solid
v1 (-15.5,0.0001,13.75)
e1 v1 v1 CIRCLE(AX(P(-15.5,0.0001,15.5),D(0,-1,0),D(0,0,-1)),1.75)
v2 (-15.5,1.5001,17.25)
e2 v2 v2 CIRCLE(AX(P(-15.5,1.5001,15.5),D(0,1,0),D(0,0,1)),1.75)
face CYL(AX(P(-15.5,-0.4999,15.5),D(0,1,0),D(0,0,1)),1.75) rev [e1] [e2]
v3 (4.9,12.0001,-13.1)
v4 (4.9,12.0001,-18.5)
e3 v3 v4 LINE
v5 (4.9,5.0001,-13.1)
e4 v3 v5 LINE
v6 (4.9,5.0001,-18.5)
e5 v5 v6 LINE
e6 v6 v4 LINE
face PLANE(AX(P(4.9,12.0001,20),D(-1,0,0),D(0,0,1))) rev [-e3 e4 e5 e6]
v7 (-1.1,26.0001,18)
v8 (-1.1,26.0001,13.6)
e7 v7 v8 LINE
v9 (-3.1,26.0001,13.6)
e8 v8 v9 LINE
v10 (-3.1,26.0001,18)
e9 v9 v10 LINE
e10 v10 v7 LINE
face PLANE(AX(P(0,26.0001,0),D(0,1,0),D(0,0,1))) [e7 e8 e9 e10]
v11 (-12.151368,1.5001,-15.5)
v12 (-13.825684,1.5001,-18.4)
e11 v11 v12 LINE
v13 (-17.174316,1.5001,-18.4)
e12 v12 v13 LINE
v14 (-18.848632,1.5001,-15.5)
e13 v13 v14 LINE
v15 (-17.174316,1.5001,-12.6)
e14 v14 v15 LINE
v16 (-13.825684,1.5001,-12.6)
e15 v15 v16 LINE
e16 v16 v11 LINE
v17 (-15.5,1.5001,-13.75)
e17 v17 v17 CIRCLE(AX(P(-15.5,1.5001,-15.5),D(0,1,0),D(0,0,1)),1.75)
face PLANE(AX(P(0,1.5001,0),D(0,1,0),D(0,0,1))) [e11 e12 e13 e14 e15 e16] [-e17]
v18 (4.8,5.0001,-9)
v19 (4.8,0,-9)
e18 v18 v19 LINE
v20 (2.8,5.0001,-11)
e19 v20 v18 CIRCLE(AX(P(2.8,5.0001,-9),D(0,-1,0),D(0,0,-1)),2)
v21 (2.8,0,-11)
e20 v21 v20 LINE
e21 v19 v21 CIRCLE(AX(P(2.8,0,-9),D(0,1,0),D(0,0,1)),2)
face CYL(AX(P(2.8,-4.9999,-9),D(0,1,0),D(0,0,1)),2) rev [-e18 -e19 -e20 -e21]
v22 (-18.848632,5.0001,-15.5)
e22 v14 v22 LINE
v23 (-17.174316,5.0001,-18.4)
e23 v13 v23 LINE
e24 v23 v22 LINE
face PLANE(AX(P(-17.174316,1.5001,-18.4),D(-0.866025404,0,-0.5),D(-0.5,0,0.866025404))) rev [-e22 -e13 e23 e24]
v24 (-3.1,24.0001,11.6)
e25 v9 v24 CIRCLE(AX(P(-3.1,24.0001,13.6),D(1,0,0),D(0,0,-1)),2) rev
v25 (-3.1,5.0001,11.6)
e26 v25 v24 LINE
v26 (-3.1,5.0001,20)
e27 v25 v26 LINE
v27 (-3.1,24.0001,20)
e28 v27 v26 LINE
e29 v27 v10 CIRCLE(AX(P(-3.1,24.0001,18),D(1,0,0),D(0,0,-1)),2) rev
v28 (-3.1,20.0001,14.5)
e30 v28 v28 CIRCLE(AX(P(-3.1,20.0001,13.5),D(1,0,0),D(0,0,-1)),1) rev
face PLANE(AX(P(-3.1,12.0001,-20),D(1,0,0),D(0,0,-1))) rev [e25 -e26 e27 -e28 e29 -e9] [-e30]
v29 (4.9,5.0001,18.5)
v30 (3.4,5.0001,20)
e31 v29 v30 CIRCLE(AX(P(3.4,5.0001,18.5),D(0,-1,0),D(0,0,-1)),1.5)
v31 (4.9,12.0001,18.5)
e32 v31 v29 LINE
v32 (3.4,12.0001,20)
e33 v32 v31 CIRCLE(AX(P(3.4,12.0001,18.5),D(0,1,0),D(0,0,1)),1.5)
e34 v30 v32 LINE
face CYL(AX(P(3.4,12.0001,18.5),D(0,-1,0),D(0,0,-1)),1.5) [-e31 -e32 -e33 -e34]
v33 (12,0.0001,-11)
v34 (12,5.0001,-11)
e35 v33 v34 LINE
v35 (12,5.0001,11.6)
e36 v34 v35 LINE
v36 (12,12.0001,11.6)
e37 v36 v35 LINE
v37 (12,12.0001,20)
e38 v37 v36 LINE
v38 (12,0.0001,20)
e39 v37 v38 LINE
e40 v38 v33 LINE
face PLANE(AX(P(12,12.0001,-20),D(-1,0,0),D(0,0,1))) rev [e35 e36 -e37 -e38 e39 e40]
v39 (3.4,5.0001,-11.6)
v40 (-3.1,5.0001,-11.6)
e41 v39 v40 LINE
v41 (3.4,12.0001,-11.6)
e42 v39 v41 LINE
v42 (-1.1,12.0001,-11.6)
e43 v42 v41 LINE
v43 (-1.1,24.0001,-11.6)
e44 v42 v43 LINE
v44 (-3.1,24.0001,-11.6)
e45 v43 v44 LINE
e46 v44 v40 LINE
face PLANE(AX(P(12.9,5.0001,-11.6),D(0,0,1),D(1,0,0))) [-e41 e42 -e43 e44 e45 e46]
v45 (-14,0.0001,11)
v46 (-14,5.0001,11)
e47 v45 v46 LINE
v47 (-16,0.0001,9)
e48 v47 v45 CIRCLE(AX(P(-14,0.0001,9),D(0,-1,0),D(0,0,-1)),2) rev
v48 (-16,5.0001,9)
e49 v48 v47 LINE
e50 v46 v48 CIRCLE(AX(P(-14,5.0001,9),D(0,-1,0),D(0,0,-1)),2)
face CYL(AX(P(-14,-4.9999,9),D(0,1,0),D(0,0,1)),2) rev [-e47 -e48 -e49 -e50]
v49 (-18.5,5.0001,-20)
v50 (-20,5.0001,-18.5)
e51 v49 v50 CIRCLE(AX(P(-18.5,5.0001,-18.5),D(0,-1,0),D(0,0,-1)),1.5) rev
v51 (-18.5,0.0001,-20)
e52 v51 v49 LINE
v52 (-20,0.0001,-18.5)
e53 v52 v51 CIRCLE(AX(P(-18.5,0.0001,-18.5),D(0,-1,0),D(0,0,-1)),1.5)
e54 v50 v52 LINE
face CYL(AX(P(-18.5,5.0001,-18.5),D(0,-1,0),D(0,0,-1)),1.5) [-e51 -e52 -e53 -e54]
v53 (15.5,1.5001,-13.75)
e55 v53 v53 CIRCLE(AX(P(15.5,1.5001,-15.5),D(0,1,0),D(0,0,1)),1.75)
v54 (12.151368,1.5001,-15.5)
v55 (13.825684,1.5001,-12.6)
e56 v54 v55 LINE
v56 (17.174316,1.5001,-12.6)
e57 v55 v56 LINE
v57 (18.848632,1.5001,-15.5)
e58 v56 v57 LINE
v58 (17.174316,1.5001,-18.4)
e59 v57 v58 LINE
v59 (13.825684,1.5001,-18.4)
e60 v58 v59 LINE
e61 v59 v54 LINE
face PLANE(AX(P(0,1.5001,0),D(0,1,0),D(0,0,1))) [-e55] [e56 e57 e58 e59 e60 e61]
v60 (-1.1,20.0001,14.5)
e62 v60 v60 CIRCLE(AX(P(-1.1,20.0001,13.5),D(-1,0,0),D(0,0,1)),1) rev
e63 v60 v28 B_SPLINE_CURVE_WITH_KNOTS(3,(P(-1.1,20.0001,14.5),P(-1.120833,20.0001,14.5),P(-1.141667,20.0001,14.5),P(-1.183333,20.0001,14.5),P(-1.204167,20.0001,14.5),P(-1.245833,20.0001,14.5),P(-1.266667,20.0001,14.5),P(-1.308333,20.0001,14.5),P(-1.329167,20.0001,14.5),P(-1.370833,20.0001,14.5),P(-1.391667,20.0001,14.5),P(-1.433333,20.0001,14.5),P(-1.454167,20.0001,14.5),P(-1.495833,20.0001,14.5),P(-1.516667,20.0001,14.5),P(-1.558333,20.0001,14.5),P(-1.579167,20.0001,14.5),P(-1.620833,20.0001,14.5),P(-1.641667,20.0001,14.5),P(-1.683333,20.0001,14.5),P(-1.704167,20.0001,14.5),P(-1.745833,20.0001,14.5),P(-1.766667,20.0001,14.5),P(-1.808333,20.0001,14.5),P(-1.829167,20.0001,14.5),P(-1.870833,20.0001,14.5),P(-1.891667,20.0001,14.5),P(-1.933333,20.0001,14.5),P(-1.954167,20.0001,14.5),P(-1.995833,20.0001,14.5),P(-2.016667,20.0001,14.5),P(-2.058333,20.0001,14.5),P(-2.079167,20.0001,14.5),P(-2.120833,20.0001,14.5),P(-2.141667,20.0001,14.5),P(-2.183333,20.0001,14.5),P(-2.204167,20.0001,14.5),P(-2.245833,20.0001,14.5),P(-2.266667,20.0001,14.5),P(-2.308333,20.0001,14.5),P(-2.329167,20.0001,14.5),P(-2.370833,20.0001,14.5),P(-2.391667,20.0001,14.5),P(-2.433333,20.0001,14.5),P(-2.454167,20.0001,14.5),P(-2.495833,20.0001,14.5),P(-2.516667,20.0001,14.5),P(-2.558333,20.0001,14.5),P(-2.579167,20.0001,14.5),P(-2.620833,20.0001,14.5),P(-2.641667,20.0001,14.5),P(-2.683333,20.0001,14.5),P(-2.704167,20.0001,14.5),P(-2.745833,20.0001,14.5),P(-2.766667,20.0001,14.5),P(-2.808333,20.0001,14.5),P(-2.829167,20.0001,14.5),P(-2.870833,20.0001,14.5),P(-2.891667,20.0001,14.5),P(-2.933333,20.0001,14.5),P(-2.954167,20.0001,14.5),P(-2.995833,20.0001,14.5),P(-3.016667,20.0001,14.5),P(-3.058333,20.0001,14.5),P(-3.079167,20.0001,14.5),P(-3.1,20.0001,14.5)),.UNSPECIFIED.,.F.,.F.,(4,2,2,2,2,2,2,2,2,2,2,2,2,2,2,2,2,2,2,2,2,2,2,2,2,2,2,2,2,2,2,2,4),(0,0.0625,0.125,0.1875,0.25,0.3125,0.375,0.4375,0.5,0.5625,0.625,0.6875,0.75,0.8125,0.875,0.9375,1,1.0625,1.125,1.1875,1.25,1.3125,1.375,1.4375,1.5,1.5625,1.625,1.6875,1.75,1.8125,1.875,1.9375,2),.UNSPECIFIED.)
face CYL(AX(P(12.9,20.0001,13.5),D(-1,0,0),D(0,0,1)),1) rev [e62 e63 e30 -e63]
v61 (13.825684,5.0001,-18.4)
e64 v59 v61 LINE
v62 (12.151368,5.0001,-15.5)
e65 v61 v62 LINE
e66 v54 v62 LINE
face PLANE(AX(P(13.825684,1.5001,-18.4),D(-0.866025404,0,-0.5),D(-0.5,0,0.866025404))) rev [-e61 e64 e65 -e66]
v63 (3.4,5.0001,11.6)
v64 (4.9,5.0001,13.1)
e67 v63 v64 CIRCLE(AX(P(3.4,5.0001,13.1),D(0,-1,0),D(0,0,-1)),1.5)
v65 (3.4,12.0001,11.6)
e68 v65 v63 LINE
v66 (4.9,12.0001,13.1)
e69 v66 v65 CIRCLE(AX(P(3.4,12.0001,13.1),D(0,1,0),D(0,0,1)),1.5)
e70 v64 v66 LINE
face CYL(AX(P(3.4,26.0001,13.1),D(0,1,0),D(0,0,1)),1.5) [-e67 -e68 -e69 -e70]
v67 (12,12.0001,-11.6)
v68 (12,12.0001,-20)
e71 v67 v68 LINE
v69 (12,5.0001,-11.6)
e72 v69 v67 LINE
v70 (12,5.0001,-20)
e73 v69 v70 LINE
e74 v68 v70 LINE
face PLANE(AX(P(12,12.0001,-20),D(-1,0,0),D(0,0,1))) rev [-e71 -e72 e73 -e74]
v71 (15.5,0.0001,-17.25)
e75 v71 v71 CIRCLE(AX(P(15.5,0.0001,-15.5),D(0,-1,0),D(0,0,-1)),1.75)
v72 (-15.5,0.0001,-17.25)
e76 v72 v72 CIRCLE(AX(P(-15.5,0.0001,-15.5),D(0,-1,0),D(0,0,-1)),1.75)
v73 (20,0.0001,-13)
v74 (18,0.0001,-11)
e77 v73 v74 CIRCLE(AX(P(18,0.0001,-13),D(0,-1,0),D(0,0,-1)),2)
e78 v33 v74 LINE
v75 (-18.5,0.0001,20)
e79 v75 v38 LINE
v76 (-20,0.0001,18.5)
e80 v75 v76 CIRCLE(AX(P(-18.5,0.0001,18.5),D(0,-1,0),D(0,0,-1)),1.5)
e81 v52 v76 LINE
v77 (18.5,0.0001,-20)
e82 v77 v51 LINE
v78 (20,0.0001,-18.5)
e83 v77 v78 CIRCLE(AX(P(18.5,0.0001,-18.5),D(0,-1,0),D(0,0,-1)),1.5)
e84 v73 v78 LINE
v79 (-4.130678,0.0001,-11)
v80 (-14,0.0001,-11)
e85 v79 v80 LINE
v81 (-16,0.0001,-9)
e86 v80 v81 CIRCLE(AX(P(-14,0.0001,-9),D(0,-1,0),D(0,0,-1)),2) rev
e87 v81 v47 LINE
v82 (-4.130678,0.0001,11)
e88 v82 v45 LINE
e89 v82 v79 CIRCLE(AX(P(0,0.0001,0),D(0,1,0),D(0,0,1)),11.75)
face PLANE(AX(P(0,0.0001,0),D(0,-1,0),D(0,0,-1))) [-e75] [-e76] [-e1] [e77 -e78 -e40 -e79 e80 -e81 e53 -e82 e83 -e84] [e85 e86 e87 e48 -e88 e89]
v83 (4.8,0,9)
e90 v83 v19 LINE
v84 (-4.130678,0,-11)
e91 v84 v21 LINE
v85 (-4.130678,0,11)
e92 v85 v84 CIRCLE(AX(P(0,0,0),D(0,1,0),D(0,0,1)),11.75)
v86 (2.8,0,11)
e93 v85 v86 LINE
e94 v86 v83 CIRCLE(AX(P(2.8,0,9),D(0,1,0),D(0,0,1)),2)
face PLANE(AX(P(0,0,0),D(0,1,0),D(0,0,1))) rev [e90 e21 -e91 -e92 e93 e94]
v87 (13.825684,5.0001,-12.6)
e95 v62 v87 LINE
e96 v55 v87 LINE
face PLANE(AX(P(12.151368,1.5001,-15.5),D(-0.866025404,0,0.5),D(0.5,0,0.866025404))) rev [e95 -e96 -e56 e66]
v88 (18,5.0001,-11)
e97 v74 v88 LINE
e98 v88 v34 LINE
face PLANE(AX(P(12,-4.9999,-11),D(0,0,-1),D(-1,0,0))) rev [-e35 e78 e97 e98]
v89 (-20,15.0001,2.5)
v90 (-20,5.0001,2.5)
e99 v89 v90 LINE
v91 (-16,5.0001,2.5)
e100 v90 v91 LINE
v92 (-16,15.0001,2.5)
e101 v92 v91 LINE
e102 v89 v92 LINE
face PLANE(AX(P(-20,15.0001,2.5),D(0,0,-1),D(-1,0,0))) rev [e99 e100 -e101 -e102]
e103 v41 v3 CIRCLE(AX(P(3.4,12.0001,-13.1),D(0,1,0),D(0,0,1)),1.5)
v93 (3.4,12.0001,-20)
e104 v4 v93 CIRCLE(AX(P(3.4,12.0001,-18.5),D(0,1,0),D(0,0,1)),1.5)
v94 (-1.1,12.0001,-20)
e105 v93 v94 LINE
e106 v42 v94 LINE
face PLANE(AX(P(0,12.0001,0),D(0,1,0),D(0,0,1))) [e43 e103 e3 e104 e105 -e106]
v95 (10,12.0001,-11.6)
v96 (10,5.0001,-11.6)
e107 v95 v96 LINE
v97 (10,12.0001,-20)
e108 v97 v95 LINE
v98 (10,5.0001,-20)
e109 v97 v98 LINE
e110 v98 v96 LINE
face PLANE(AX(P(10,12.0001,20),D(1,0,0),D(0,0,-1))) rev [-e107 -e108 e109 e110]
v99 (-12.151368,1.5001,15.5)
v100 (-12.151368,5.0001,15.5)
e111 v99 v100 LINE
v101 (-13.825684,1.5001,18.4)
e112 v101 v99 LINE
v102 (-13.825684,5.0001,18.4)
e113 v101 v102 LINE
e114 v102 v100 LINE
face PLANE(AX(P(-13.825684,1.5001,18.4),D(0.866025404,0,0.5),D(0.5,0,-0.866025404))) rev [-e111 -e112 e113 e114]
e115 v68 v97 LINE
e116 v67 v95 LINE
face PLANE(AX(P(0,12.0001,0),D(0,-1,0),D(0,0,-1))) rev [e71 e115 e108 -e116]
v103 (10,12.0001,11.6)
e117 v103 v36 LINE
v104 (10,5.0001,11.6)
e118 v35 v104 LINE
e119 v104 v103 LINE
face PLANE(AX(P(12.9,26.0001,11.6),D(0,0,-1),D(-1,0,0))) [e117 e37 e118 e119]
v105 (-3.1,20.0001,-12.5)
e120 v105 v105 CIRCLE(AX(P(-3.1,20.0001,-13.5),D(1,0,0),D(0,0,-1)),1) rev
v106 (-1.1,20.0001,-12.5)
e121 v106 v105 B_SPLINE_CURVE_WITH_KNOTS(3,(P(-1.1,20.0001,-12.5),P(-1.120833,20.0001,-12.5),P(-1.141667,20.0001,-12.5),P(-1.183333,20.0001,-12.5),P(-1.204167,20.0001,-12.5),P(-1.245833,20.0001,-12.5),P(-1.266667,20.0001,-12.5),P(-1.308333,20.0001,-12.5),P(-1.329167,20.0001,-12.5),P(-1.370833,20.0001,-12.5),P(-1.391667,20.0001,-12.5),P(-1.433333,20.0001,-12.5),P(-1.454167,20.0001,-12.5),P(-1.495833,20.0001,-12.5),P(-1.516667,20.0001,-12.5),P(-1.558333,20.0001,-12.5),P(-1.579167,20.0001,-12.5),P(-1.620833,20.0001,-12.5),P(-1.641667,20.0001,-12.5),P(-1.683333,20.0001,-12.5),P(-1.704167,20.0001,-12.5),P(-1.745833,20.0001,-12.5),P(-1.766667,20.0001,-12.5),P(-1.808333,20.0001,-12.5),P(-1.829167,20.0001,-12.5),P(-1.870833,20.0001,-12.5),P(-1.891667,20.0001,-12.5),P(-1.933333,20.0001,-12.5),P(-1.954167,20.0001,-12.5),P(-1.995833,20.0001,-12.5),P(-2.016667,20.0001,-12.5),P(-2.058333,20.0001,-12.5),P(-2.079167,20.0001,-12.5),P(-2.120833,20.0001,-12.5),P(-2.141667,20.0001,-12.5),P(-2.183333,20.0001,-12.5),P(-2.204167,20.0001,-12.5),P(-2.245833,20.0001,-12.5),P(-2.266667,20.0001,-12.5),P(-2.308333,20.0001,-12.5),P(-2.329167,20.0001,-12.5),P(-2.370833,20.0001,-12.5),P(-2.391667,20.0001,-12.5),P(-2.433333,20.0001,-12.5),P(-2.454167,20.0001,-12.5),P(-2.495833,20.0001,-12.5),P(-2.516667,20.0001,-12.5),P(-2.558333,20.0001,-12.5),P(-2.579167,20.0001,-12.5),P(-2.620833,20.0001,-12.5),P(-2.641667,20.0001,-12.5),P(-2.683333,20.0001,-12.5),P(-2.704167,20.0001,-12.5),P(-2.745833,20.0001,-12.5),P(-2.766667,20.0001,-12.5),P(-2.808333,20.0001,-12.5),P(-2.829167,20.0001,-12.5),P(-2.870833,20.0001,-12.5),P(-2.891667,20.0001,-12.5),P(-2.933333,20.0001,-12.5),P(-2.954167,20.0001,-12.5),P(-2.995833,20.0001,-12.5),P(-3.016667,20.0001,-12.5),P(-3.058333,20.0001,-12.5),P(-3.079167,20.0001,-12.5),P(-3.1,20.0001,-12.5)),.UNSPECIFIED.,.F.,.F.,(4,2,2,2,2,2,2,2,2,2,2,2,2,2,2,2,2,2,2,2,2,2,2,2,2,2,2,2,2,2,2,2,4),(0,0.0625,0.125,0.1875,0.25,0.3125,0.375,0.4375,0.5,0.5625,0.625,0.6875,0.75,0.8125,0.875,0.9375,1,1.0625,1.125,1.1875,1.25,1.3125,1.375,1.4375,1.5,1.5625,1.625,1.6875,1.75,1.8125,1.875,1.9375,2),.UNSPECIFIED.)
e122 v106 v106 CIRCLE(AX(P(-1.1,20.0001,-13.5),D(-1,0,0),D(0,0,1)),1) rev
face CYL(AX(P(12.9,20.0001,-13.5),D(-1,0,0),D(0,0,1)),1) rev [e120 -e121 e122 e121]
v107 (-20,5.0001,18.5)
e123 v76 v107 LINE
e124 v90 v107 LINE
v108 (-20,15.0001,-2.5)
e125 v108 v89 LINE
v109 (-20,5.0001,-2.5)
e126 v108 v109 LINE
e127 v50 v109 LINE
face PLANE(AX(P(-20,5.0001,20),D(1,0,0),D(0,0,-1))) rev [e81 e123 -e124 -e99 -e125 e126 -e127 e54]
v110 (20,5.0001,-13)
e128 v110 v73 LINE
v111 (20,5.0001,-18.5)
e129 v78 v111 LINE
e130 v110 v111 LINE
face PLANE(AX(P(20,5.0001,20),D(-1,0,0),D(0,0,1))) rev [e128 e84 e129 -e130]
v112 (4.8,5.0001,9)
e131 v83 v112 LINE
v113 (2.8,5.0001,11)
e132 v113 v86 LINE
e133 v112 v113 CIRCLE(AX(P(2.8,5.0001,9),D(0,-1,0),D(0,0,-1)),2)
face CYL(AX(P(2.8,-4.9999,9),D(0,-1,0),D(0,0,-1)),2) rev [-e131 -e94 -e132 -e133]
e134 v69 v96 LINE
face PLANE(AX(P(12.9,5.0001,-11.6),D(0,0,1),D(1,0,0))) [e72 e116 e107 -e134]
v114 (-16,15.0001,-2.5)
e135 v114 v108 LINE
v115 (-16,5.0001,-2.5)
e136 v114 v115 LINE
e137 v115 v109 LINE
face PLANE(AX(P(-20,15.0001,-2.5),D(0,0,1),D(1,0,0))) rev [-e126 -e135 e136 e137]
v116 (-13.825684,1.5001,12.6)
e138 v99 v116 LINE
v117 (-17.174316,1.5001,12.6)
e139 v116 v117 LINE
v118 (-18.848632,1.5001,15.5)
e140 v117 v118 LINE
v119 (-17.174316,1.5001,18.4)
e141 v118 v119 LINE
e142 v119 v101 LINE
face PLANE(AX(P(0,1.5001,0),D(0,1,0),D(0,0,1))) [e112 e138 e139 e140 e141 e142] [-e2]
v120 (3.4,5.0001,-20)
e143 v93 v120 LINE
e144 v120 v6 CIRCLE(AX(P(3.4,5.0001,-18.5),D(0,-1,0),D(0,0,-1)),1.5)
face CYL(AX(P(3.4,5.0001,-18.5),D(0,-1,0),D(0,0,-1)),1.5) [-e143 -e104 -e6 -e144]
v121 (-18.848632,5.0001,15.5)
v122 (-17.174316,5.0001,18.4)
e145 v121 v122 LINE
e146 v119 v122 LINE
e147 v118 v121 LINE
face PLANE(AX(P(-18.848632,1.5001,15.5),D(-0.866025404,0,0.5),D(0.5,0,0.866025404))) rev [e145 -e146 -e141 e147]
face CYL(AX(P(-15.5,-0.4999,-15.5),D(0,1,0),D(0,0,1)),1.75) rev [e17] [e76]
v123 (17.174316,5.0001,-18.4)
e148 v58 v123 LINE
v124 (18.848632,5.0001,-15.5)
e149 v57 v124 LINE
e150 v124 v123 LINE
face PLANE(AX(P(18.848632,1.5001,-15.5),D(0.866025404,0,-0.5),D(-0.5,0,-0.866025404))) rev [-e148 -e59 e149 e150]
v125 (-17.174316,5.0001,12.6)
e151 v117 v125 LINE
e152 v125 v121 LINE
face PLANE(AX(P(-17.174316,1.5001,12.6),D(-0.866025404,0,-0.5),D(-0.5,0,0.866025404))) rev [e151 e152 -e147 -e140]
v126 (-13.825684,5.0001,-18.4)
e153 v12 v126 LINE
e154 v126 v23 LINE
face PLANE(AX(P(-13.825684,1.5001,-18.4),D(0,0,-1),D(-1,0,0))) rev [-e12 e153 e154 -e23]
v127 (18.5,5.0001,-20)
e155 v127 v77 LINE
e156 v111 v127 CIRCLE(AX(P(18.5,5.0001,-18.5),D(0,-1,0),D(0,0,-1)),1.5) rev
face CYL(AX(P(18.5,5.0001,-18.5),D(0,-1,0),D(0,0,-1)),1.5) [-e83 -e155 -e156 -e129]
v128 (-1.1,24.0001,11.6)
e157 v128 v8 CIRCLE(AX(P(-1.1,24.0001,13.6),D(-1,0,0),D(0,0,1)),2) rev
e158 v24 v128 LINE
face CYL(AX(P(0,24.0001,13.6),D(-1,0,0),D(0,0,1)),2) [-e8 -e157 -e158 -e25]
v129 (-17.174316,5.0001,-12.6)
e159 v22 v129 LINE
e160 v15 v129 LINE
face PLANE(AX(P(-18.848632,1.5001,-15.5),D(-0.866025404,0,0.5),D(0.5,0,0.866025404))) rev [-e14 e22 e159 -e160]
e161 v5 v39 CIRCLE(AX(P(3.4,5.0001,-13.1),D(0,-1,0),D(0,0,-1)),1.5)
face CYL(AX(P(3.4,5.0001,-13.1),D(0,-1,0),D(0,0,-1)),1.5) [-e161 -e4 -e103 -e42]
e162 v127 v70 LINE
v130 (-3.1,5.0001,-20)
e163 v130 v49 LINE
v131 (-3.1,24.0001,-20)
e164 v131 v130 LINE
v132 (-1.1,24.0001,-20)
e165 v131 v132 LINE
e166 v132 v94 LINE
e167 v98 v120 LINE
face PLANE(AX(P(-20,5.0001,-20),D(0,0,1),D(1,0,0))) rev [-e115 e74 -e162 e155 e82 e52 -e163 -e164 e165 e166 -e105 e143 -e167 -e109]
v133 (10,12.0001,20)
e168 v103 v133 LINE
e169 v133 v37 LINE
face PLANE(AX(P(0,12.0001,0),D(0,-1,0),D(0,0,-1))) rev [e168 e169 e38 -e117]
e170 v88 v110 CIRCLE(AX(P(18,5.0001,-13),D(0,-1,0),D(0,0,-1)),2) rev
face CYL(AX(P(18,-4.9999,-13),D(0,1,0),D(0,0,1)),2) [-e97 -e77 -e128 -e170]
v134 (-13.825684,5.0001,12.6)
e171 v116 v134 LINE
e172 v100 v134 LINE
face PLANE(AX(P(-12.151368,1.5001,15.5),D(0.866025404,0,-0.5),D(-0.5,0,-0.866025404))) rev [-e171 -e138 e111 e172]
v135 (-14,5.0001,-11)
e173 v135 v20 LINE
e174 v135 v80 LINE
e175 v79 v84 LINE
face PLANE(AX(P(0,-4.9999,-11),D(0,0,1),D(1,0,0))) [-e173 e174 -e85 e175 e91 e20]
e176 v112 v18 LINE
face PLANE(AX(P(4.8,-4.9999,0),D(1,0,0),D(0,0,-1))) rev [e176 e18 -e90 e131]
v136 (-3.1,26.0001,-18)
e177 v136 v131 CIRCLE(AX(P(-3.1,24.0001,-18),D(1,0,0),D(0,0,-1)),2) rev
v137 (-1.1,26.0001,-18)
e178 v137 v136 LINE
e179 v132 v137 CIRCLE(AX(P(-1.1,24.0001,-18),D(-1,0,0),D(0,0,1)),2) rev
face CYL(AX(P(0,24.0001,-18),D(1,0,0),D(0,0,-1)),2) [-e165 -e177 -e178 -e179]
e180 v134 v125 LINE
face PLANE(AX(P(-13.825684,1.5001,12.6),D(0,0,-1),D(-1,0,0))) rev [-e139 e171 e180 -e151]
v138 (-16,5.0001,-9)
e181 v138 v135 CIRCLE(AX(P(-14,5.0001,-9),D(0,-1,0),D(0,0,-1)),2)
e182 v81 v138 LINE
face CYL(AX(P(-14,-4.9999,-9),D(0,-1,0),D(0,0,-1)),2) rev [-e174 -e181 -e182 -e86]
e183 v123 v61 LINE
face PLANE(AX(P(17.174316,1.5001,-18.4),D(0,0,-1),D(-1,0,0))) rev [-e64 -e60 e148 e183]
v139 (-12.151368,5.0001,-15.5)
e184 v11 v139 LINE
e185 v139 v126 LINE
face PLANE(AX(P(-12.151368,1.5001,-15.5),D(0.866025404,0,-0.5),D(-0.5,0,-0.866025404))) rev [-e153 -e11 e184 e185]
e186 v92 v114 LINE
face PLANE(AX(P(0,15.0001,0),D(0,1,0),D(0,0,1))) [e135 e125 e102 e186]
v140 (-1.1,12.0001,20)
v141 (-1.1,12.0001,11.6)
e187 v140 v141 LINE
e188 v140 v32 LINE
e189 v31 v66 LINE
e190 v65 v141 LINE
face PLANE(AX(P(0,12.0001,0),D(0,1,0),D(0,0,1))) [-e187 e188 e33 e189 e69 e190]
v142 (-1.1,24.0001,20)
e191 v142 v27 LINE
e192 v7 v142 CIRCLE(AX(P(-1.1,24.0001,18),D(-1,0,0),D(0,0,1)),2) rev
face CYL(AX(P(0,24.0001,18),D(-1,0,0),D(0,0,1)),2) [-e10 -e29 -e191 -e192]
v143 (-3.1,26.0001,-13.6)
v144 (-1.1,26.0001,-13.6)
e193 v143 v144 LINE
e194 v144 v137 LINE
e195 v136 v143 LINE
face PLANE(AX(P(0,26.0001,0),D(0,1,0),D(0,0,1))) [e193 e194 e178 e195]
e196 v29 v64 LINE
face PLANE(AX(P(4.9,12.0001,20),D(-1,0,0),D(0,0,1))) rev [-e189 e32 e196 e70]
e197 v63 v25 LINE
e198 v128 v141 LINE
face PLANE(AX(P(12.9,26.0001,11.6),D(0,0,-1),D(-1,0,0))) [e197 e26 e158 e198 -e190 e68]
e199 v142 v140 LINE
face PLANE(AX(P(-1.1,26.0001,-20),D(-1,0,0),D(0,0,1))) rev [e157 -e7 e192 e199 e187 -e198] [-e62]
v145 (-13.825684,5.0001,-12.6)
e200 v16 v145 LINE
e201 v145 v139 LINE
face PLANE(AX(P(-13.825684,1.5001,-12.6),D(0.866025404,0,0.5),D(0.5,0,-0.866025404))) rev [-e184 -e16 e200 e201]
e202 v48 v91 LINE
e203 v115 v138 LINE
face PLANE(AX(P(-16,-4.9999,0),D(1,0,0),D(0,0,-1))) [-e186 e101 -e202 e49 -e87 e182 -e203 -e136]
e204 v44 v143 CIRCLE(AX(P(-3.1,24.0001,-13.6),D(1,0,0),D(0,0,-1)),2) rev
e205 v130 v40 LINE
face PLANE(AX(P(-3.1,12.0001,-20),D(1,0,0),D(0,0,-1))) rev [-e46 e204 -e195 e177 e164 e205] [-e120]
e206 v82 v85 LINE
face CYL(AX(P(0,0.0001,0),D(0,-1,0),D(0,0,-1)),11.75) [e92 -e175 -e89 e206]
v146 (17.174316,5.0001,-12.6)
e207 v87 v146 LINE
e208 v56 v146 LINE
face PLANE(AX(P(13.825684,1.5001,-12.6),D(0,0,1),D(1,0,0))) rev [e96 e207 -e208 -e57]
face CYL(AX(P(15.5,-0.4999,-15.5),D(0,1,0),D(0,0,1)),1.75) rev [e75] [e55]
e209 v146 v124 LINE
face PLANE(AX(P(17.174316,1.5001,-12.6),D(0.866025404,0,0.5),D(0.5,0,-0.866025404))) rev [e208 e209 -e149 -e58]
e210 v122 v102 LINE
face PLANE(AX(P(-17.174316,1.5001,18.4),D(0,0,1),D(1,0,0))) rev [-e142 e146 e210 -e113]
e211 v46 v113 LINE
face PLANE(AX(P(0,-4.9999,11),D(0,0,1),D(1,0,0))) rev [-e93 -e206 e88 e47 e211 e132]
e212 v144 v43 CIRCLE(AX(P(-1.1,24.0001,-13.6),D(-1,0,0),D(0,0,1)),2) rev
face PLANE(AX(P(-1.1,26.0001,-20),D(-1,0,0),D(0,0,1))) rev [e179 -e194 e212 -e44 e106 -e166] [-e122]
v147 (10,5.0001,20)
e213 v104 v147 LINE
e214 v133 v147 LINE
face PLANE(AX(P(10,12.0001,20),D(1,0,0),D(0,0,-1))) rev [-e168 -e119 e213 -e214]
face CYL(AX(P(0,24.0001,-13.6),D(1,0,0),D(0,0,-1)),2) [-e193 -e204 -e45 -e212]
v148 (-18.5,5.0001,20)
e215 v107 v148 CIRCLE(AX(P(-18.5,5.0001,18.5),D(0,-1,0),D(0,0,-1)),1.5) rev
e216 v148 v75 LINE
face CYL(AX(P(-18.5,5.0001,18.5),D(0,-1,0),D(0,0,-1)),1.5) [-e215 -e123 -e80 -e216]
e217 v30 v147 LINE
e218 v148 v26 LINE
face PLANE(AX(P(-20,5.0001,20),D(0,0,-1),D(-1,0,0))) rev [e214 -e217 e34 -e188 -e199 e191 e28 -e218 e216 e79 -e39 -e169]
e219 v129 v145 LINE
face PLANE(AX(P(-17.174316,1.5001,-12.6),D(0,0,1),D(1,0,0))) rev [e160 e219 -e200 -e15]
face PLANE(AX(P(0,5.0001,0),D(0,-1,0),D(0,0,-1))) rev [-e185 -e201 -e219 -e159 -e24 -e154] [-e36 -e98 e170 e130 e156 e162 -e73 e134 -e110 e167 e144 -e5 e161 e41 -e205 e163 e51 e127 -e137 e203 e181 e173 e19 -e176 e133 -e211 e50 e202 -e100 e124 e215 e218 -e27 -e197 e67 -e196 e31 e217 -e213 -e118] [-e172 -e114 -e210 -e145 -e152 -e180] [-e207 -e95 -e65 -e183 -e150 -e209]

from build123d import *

# Parameters (mm, degrees)
ESQUISSE1_R                  = 11.75
BOSS_EXTRU_1_DEPTH           = 0.0001
ESQUISSE2_W                  = 40
ESQUISSE2_H                  = 40
BOSS_EXTRU_2_DEPTH           = 5
ENL_V_MAT_EXTRU_1_DEPTH      = 3.5
ESQUISSE4_R                  = 1.75
ENL_V_MAT_EXTRU_2_DEPTH      = 2
ESQUISSE5_W                  = 2
ESQUISSE5_H                  = 40
ESQUISSE5_W_2                = 8
BOSS_EXTRU_3_DEPTH           = 7
ESQUISSE6_W                  = 2
ESQUISSE6_H                  = 40
BOSS_EXTRU_4_DEPTH           = 14
ENL_V_MAT_EXTRU_3_DEPTH      = 14
ENL_V_MAT_EXTRU_3_DEPTH_BACK = 14
ESQUISSE7_R                  = 1
CONG_1_R                     = 2
CONG_2_R                     = 1.5
CONG_3_R                     = 1.5
ESQUISSE10_W                 = 8
ESQUISSE10_H                 = 31
ENL_V_MAT_EXTRU_4_DEPTH      = 10
CONG_4_R                     = 2
ESQUISSE11_W                 = 20.8
ESQUISSE11_H                 = 22
ENL_V_MAT_EXTRU_5_DEPTH      = 10
CONG_5_R                     = 2
ESQUISSE12_W                 = 4
ESQUISSE12_H                 = 5
BOSS_EXTRU_5_DEPTH           = 10


with BuildPart() as part:
    # Esquisse1 → Boss.-Extru.1 (new body)
    with BuildSketch(Plane(origin=(0, 0, 0), x_dir=(1, 0, 0), z_dir=(0, 1, 0))):
        with Locations(Location((0, 0, 0), (0, 0, 270))):
            Circle(ESQUISSE1_R)
    extrude(amount=BOSS_EXTRU_1_DEPTH)

    # Esquisse2 → Boss.-Extru.2 (add)
    with BuildSketch(Plane(origin=(0, 0.0001, 0), x_dir=(1, 0, 0), z_dir=(0, 1, 0))):
        Rectangle(ESQUISSE2_W, ESQUISSE2_H)
    extrude(amount=BOSS_EXTRU_2_DEPTH)

    # Esquisse3 → Enlèv. mat.-Extru.1 (cut)
    with BuildSketch(Plane(origin=(0, 5.0001, 0), x_dir=(1, 0, 0), z_dir=(0, 1, 0))):
        Polygon((-13.825684219, 12.6), (-12.151368439, 15.5), (-13.825684219, 18.4), (-17.174315781, 18.4), (-18.848631561, 15.5), (-17.174315781, 12.6), align=None)
        Polygon((-18.848631561, -15.5), (-17.174315781, -18.4), (-13.825684219, -18.4), (-12.151368439, -15.5), (-13.825684219, -12.6), (-17.174315781, -12.6), align=None)
        Polygon((12.151368439, -15.5), (13.825684219, -18.4), (17.174315781, -18.4), (18.848631561, -15.5), (17.174315781, -12.6), (13.825684219, -12.6), align=None)
        Polygon((13.825684219, 12.6), (17.174315781, 12.6), (18.848631561, 15.5), (17.174315781, 18.4), (13.825684219, 18.4), (12.151368439, 15.5), align=None)
    extrude(amount=-ENL_V_MAT_EXTRU_1_DEPTH, mode=Mode.SUBTRACT)

    # Esquisse4 → Enlèv. mat.-Extru.2 (cut)
    with BuildSketch(Plane(origin=(0, 1.5001, 0), x_dir=(1, 0, 0), z_dir=(0, 1, 0))):
        with Locations(Location((-15.5, 15.5, 0), (0, 0, 270))):
            Circle(ESQUISSE4_R)
        with Locations(Location((15.5, 15.5, 0), (0, 0, 270))):
            Circle(ESQUISSE4_R)
        with Locations(Location((-15.5, -15.5, 0), (0, 0, 270))):
            Circle(ESQUISSE4_R)
        with Locations(Location((15.5, -15.5, 0), (0, 0, 270))):
            Circle(ESQUISSE4_R)
    extrude(amount=-ENL_V_MAT_EXTRU_2_DEPTH, mode=Mode.SUBTRACT)

    # Esquisse5 → Boss.-Extru.3 (add)
    with BuildSketch(Plane(origin=(0, 5.0001, 0), x_dir=(1, 0, 0), z_dir=(0, 1, 0))):
        with Locations((11, 0)):
            Rectangle(ESQUISSE5_W, ESQUISSE5_H)
        with Locations((0.9, 0)):
            Rectangle(ESQUISSE5_W_2, ESQUISSE5_H)
    extrude(amount=BOSS_EXTRU_3_DEPTH)

    # Esquisse6 → Boss.-Extru.4 (add)
    with BuildSketch(Plane(origin=(0, 12.0001, 0), x_dir=(1, 0, 0), z_dir=(0, 1, 0))):
        with Locations((-2.1, 0)):
            Rectangle(ESQUISSE6_W, ESQUISSE6_H)
    extrude(amount=BOSS_EXTRU_4_DEPTH)

    # Esquisse7 → Enlèv. mat.-Extru.3 (cut, two sides: drawn at the far end of the back side and taken through both)
    with BuildSketch(Plane(origin=(-1.1, 0, 0), x_dir=(0, 0, -1), z_dir=(1, 0, 0)).offset(-ENL_V_MAT_EXTRU_3_DEPTH_BACK)):
        with Locations(Location((-13.5, 20.0001, 0), (0, 0, 180))):
            Circle(ESQUISSE7_R)
        with Locations(Location((13.5, 20.0001, 0), (0, 0, 180))):
            Circle(ESQUISSE7_R)
        Polygon((0, 26.0001), (-11.6, 26.0001), (-11.6, 5.0001), (11.6, 5.0001), (11.6, 26.0001), align=None)
    extrude(amount=ENL_V_MAT_EXTRU_3_DEPTH + ENL_V_MAT_EXTRU_3_DEPTH_BACK, mode=Mode.SUBTRACT)

    # Congé1
    cong_1_edges = [part.edges().sort_by_distance(p)[0] for p in [
        (-2.1, 26.0001, 20),
        (-2.1, 26.0001, -20),
        (-2.1, 26.0001, 11.6),
        (-2.1, 26.0001, -11.6),
    ]]
    fillet(cong_1_edges, radius=CONG_1_R)

    # Congé2
    cong_2_edges = [part.edges().sort_by_distance(p)[0] for p in [
        (4.9, 8.5001, 20),
        (4.9, 8.5001, -20),
        (4.9, 8.5001, -11.6),
        (4.9, 8.5001, 11.6),
    ]]
    fillet(cong_2_edges, radius=CONG_2_R)

    # Congé3
    cong_3_edges = [part.edges().sort_by_distance(p)[0] for p in [
        (20, 2.5001, 20),
        (20, 2.5001, -20),
        (-20, 2.5001, -20),
        (-20, 2.5001, 20),
    ]]
    fillet(cong_3_edges, radius=CONG_3_R)

    # Esquisse10 → Enlèv. mat.-Extru.4 (cut)
    with BuildSketch(Plane(origin=(0, 5.0001, 0), x_dir=(1, 0, 0), z_dir=(0, 1, 0))):
        with Locations((16, -4.5)):
            Rectangle(ESQUISSE10_W, ESQUISSE10_H)
    extrude(amount=-ENL_V_MAT_EXTRU_4_DEPTH, mode=Mode.SUBTRACT)

    # Congé4
    cong_4_edges = [part.edges().sort_by_distance(p)[0] for p in [
        (20, 2.5001, -11),
    ]]
    fillet(cong_4_edges, radius=CONG_4_R)

    # Esquisse11 → Enlèv. mat.-Extru.5 (cut)
    with BuildSketch(Plane(origin=(0, 5.0001, 0), x_dir=(1, 0, 0), z_dir=(0, 1, 0))):
        with Locations((-5.6, 0)):
            Rectangle(ESQUISSE11_W, ESQUISSE11_H)
    extrude(amount=-ENL_V_MAT_EXTRU_5_DEPTH, mode=Mode.SUBTRACT)

    # Congé5
    # the kernel refuses this fillet: 2 mm, written as the material it adds along each edge
    with BuildSketch(Plane(origin=(4.8, 5.0001, 11), x_dir=(0, 0, -1), z_dir=(0, -1, 0))) as cong_5_piece_1_section:
        with BuildLine():
            CenterArc((CONG_5_R, -CONG_5_R), CONG_5_R, 90, 90)
            Line((0, -CONG_5_R), (0, 0))
            Line((0, 0), (CONG_5_R, 0))
        make_face()
    cong_5_piece_1 = extrude(amount=10, mode=Mode.PRIVATE)
    cong_5_piece_1 = split(cong_5_piece_1, bisect_by=Plane(origin=(4.313925052, 0, 10.490530882), z_dir=(0, 1, 0)), keep=Keep.TOP, mode=Mode.PRIVATE)
    add(cong_5_piece_1)
    with BuildSketch(Plane(origin=(-16, 5.0001, 11), x_dir=(0, 0, -1), z_dir=(0, -1, 0))) as cong_5_piece_2:
        with BuildLine():
            CenterArc((CONG_5_R, CONG_5_R), CONG_5_R, 180, 90)
            Line((0, CONG_5_R), (0, 0))
            Line((0, 0), (CONG_5_R, 0))
        make_face()
    extrude(amount=5)
    with BuildSketch(Plane(origin=(4.8, 5.0001, -11), x_dir=(-1, 0, 0), z_dir=(0, -1, 0))) as cong_5_piece_3_section:
        with BuildLine():
            CenterArc((CONG_5_R, -CONG_5_R), CONG_5_R, 90, 90)
            Line((0, -CONG_5_R), (0, 0))
            Line((0, 0), (CONG_5_R, 0))
        make_face()
    cong_5_piece_3 = extrude(amount=10, mode=Mode.PRIVATE)
    cong_5_piece_3 = split(cong_5_piece_3, bisect_by=Plane(origin=(4.313925052, 0, -10.490530882), z_dir=(0, 1, 0)), keep=Keep.TOP, mode=Mode.PRIVATE)
    add(cong_5_piece_3)
    with BuildSketch(Plane(origin=(-16, 5.0001, -11), x_dir=(0, 0, 1), z_dir=(0, -1, 0))) as cong_5_piece_4:
        with BuildLine():
            CenterArc((CONG_5_R, -CONG_5_R), CONG_5_R, 90, 90)
            Line((0, -CONG_5_R), (0, 0))
            Line((0, 0), (CONG_5_R, 0))
        make_face()
    extrude(amount=5)

    # Esquisse12 → Boss.-Extru.5 (add)
    with BuildSketch(Plane(origin=(0, 5.0001, 0), x_dir=(1, 0, 0), z_dir=(0, 1, 0))):
        with Locations((-18, 0)):
            Rectangle(ESQUISSE12_W, ESQUISSE12_H)
    extrude(amount=BOSS_EXTRU_5_DEPTH)


solid = part.part
